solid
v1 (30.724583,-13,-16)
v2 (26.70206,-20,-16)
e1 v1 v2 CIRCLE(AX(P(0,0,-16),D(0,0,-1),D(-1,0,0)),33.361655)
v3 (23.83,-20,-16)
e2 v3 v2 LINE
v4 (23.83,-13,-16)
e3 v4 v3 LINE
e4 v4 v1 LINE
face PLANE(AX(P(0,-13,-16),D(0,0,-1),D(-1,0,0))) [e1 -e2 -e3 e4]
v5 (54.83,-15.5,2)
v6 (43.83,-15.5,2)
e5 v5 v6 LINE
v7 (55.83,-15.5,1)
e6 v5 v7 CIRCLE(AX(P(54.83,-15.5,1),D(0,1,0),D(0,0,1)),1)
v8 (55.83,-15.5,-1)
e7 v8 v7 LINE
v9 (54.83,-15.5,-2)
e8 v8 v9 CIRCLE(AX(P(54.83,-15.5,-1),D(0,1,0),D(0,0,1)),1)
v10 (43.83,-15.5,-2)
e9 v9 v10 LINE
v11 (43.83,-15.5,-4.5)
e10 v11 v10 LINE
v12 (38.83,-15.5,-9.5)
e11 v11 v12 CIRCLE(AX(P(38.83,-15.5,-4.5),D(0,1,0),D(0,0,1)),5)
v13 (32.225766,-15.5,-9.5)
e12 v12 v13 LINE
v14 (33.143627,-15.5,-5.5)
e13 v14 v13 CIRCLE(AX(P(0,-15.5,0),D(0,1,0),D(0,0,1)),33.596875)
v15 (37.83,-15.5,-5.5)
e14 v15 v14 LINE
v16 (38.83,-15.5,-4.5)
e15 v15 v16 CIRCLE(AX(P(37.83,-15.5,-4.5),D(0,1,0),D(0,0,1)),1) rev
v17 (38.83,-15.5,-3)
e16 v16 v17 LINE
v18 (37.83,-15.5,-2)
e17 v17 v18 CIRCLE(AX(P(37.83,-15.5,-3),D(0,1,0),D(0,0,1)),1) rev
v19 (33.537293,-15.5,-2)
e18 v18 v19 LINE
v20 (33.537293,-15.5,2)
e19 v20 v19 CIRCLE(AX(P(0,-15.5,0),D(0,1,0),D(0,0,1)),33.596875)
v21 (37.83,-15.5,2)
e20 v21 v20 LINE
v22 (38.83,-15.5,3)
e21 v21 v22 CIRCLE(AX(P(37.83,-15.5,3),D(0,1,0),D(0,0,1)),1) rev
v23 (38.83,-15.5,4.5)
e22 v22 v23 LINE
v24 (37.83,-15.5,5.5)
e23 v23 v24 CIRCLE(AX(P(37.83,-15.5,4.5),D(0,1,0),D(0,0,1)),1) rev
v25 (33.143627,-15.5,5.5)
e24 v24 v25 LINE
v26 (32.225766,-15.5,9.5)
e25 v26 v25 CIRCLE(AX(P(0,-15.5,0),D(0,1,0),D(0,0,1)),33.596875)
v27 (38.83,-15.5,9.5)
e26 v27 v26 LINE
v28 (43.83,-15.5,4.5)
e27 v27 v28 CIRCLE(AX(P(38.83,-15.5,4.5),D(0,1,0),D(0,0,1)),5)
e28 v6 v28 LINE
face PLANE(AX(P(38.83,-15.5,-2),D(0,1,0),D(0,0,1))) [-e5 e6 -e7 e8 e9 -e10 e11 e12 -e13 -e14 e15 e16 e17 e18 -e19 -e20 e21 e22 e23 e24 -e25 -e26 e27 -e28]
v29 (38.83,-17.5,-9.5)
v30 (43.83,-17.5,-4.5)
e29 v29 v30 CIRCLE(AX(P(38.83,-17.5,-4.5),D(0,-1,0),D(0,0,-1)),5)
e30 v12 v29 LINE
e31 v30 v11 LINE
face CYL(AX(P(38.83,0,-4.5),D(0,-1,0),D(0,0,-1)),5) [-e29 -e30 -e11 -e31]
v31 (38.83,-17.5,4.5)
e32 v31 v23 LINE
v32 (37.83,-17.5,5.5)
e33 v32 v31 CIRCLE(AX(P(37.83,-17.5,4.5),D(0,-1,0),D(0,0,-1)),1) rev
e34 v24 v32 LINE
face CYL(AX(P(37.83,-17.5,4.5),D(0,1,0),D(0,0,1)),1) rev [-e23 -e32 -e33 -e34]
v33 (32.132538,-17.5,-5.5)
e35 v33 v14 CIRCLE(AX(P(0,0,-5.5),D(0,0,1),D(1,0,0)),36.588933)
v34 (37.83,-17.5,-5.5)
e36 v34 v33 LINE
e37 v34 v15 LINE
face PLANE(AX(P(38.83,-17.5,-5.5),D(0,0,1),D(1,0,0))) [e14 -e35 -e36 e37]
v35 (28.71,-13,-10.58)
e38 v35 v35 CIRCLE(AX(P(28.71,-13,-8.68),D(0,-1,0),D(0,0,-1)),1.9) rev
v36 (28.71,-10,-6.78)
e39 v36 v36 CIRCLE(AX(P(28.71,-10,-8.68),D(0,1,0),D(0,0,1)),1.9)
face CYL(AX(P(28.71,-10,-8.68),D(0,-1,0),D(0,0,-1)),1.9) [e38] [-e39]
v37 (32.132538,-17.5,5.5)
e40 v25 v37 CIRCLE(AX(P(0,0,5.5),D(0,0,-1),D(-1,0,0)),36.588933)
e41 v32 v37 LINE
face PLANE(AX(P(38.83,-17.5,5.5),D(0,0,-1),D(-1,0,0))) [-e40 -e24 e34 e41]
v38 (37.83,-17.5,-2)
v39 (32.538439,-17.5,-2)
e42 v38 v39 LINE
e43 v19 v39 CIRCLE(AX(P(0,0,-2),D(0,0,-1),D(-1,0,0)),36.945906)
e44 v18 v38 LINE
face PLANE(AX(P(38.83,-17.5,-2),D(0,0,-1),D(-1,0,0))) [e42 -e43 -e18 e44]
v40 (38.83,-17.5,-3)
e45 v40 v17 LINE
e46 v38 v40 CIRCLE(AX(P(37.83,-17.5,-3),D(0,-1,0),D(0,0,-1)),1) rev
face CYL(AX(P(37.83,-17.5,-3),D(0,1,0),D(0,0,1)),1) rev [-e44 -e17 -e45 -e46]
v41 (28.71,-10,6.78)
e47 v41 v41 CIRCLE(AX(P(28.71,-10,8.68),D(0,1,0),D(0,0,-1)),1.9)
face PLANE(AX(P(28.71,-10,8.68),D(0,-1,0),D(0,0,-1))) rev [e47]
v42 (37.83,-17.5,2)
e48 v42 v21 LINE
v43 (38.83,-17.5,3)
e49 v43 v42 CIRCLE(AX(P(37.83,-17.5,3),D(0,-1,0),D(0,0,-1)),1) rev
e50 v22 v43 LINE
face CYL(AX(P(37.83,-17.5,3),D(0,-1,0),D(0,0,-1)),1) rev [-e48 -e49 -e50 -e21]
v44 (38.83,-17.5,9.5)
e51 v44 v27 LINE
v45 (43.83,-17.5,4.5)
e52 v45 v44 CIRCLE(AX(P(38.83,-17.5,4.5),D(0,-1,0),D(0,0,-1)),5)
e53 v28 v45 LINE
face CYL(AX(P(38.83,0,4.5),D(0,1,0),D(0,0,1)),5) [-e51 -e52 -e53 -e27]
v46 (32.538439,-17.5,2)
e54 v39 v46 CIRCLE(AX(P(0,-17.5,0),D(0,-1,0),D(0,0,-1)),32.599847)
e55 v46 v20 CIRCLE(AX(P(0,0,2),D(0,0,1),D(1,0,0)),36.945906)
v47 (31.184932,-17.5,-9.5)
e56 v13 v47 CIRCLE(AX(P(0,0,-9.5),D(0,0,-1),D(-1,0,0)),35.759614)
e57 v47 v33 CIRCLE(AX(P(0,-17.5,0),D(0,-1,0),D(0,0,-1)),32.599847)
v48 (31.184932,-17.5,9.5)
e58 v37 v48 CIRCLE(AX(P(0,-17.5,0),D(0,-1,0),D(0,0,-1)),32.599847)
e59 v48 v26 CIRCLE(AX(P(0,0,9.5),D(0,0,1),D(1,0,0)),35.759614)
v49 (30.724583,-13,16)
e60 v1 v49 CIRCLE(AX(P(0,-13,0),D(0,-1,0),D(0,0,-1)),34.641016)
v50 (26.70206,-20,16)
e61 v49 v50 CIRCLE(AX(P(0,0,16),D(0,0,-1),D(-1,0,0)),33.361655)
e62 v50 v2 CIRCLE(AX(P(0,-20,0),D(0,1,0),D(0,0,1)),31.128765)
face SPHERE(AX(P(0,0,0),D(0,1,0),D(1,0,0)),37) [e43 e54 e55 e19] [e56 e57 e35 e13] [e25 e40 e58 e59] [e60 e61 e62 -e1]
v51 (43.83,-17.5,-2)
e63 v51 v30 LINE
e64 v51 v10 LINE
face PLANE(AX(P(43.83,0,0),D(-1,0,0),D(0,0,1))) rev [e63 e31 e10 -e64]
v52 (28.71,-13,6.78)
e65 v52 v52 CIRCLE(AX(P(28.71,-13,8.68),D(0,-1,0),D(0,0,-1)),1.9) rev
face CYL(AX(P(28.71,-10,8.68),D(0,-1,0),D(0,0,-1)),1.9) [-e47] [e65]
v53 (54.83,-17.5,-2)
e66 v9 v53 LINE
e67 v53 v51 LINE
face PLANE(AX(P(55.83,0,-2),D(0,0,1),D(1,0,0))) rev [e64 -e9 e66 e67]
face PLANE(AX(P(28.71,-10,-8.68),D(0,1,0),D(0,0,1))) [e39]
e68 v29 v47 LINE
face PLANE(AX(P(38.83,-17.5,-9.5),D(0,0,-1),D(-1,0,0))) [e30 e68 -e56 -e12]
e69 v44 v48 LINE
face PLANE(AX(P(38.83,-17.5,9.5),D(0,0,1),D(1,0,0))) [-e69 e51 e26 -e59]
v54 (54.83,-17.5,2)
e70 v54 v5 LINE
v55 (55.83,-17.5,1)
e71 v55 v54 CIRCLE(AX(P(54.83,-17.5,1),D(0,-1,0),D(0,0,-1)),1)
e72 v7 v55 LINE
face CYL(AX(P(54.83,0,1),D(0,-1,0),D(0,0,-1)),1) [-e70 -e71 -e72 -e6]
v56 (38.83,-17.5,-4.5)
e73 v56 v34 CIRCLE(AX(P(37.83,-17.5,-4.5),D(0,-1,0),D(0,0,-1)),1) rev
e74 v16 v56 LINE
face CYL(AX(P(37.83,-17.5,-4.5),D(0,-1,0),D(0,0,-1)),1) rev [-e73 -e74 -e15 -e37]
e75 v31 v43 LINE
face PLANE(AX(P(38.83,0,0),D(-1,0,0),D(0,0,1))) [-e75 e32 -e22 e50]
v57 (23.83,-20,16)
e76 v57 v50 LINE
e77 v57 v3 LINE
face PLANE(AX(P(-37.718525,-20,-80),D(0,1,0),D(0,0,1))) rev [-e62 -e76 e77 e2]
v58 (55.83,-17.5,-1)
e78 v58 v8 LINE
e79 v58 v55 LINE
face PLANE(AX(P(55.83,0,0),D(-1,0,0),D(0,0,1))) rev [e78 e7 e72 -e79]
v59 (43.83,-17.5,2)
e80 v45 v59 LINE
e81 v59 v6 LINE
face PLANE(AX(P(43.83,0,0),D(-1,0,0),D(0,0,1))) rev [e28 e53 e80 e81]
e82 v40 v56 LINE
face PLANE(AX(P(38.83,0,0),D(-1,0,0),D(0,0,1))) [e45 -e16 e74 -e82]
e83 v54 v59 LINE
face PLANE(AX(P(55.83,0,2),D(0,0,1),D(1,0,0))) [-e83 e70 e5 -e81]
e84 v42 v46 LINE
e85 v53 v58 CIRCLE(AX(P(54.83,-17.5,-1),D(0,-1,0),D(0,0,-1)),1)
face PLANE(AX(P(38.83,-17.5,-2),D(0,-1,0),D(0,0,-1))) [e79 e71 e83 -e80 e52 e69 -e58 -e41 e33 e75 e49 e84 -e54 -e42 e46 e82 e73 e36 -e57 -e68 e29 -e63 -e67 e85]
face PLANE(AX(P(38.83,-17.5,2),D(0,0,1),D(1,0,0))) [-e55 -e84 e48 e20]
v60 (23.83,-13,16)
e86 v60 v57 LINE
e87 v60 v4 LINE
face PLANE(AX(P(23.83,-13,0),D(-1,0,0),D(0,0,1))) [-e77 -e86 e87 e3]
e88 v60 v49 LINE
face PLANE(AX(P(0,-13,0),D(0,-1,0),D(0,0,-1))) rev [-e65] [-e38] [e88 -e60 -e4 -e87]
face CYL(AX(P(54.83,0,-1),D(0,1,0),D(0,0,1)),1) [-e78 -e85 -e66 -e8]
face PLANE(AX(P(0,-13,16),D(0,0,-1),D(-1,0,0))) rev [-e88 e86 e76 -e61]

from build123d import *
from build123d.topology import SkipClean

# Parameters (mm, degrees)
CUT_EXTRUDE_3_DEPTH       = 80
CUT_EXTRUDE_START         = -57
CUT_EXTRUDE_4_DEPTH       = 57
CUT_EXTRUDE_4_2_OUTLINE_W = 14.17
CUT_EXTRUDE_4_2_OUTLINE_H = 32
CUT_EXTRUDE_4_2_DEPTH     = 50
SKETCH_7_R                = 1.9
EXTRUDE_2_DEPTH           = 3
SKETCH_8_W                = 4
SKETCH_8_H                = 2
EXTRUDE_3_DEPTH           = 15
SKETCH_9_W                = 19
SKETCH_9_H                = 2
EXTRUDE_4_DEPTH           = 5
SKETCH_8_2_W              = 4
SKETCH_8_2_H              = 2
EXTRUDE_5_DEPTH           = 32
FILLET_1_R                = 5
FILLET_2_R                = 1
FILLET_3_R                = 1


# Read off the part's stored shape, not the designer's step: 컷-돌출4
with BuildPart() as part:
    # 스케치4 → 회전1 (revolve)
    with SkipClean():  # the faces are left unmerged after this step: merging them gives an invalid solid
        with BuildSketch(Plane.XY):
            with BuildLine():
                ThreePointArc((37, 0), (26.162950904, 26.162950904), (0, 37))
                Line((0, 37), (0, -37))
                ThreePointArc((0, -37), (26.162950904, -26.162950904), (37, 0))
            make_face()
            with BuildLine():
                Line((0, -37), (0, 37))
                ThreePointArc((0, 37), (-37, 0), (0, -37))
            make_face()
        revolve(axis=Axis((0, 48.172126022, 0), (0, -1, 0)))

    # 스케치5 → 컷-돌출3 (cut, symmetric)
    with SkipClean():  # the faces are left unmerged after this step: merging them gives an invalid solid
        with BuildSketch(Plane.XY):
            Polygon((-37.71852549, -20), (40.89907451, -20), (49.098598746, -47.851019931), (-38.951742745, -43.163184314), align=None)
        extrude(amount=CUT_EXTRUDE_3_DEPTH, both=True, mode=Mode.SUBTRACT)

    # 컷-돌출4 outline → 컷-돌출4 (cut)
    with BuildSketch(Plane.XZ.offset(20).offset(CUT_EXTRUDE_START)):
        Polygon((23.83, -16), (23.83, 16), (38, 16), (38, 38), (-38, 38), (-38, -38), (38, -38), (38, -16), align=None)
    extrude(amount=CUT_EXTRUDE_4_DEPTH, mode=Mode.SUBTRACT)

    # Cut-Extrude 4 2 outline → Cut-Extrude 4 2 (cut)
    with BuildSketch(Plane.XZ.offset(20).offset(CUT_EXTRUDE_START)):
        with Locations((30.915, 0)):
            Rectangle(CUT_EXTRUDE_4_2_OUTLINE_W, CUT_EXTRUDE_4_2_OUTLINE_H)
    extrude(amount=CUT_EXTRUDE_4_2_DEPTH, mode=Mode.SUBTRACT)

    # 스케치7 → 보스-돌출2 (add)
    with BuildSketch(Plane(origin=(0, -13, 0), x_dir=(1, 0, 0), z_dir=(0, 1, 0))):
        with Locations(Location((28.71, 8.68, 0), (0, 0, 90))):
            Circle(SKETCH_7_R)
        with Locations(Location((28.71, -8.68, 0), (0, 0, 90))):
            Circle(SKETCH_7_R)
    extrude(amount=EXTRUDE_2_DEPTH)

    # 스케치8 → 보스-돌출3 (add)
    with BuildSketch(Plane.ZY.offset(-23.83)):
        with Locations((-7.5, -16.5)):
            Rectangle(SKETCH_8_W, SKETCH_8_H)
        with Locations((0, -16.5)):
            Rectangle(SKETCH_8_W, SKETCH_8_H)
        with Locations((7.5, -16.5)):
            Rectangle(SKETCH_8_W, SKETCH_8_H)
    extrude(amount=-EXTRUDE_3_DEPTH)

    # 스케치9 → 보스-돌출4 (add)
    with BuildSketch(Plane(origin=(38.83, 0, 0), x_dir=(0, 0, -1), z_dir=(1, 0, 0))):
        with Locations((0, -16.5)):
            Rectangle(SKETCH_9_W, SKETCH_9_H)
    extrude(amount=EXTRUDE_4_DEPTH)

    # 스케치8<2> → 보스-돌출5 (add)
    with BuildSketch(Plane.ZY.offset(-23.83)):
        with Locations((0, -16.5)):
            Rectangle(SKETCH_8_2_W, SKETCH_8_2_H)
    extrude(amount=-EXTRUDE_5_DEPTH)

    # 필렛1
    fillet_1_edges = [part.edges().sort_by_distance(p)[0] for p in [
        (43.83, -16.5, 9.5),
        (43.83, -16.5, -9.5),
    ]]
    fillet(fillet_1_edges, radius=FILLET_1_R)

    # 필렛2
    fillet_2_edges = [part.edges().sort_by_distance(p)[0] for p in [
        (38.83, -16.5, 2),
        (38.83, -16.5, -2),
        (38.83, -16.5, 5.5),
        (38.83, -16.5, -5.5),
    ]]
    fillet(fillet_2_edges, radius=FILLET_2_R)

    # 필렛3
    fillet_3_edges = [part.edges().sort_by_distance(p)[0] for p in [
        (55.83, -16.5, 2),
        (55.83, -16.5, -2),
    ]]
    fillet(fillet_3_edges, radius=FILLET_3_R)


solid = part.part
